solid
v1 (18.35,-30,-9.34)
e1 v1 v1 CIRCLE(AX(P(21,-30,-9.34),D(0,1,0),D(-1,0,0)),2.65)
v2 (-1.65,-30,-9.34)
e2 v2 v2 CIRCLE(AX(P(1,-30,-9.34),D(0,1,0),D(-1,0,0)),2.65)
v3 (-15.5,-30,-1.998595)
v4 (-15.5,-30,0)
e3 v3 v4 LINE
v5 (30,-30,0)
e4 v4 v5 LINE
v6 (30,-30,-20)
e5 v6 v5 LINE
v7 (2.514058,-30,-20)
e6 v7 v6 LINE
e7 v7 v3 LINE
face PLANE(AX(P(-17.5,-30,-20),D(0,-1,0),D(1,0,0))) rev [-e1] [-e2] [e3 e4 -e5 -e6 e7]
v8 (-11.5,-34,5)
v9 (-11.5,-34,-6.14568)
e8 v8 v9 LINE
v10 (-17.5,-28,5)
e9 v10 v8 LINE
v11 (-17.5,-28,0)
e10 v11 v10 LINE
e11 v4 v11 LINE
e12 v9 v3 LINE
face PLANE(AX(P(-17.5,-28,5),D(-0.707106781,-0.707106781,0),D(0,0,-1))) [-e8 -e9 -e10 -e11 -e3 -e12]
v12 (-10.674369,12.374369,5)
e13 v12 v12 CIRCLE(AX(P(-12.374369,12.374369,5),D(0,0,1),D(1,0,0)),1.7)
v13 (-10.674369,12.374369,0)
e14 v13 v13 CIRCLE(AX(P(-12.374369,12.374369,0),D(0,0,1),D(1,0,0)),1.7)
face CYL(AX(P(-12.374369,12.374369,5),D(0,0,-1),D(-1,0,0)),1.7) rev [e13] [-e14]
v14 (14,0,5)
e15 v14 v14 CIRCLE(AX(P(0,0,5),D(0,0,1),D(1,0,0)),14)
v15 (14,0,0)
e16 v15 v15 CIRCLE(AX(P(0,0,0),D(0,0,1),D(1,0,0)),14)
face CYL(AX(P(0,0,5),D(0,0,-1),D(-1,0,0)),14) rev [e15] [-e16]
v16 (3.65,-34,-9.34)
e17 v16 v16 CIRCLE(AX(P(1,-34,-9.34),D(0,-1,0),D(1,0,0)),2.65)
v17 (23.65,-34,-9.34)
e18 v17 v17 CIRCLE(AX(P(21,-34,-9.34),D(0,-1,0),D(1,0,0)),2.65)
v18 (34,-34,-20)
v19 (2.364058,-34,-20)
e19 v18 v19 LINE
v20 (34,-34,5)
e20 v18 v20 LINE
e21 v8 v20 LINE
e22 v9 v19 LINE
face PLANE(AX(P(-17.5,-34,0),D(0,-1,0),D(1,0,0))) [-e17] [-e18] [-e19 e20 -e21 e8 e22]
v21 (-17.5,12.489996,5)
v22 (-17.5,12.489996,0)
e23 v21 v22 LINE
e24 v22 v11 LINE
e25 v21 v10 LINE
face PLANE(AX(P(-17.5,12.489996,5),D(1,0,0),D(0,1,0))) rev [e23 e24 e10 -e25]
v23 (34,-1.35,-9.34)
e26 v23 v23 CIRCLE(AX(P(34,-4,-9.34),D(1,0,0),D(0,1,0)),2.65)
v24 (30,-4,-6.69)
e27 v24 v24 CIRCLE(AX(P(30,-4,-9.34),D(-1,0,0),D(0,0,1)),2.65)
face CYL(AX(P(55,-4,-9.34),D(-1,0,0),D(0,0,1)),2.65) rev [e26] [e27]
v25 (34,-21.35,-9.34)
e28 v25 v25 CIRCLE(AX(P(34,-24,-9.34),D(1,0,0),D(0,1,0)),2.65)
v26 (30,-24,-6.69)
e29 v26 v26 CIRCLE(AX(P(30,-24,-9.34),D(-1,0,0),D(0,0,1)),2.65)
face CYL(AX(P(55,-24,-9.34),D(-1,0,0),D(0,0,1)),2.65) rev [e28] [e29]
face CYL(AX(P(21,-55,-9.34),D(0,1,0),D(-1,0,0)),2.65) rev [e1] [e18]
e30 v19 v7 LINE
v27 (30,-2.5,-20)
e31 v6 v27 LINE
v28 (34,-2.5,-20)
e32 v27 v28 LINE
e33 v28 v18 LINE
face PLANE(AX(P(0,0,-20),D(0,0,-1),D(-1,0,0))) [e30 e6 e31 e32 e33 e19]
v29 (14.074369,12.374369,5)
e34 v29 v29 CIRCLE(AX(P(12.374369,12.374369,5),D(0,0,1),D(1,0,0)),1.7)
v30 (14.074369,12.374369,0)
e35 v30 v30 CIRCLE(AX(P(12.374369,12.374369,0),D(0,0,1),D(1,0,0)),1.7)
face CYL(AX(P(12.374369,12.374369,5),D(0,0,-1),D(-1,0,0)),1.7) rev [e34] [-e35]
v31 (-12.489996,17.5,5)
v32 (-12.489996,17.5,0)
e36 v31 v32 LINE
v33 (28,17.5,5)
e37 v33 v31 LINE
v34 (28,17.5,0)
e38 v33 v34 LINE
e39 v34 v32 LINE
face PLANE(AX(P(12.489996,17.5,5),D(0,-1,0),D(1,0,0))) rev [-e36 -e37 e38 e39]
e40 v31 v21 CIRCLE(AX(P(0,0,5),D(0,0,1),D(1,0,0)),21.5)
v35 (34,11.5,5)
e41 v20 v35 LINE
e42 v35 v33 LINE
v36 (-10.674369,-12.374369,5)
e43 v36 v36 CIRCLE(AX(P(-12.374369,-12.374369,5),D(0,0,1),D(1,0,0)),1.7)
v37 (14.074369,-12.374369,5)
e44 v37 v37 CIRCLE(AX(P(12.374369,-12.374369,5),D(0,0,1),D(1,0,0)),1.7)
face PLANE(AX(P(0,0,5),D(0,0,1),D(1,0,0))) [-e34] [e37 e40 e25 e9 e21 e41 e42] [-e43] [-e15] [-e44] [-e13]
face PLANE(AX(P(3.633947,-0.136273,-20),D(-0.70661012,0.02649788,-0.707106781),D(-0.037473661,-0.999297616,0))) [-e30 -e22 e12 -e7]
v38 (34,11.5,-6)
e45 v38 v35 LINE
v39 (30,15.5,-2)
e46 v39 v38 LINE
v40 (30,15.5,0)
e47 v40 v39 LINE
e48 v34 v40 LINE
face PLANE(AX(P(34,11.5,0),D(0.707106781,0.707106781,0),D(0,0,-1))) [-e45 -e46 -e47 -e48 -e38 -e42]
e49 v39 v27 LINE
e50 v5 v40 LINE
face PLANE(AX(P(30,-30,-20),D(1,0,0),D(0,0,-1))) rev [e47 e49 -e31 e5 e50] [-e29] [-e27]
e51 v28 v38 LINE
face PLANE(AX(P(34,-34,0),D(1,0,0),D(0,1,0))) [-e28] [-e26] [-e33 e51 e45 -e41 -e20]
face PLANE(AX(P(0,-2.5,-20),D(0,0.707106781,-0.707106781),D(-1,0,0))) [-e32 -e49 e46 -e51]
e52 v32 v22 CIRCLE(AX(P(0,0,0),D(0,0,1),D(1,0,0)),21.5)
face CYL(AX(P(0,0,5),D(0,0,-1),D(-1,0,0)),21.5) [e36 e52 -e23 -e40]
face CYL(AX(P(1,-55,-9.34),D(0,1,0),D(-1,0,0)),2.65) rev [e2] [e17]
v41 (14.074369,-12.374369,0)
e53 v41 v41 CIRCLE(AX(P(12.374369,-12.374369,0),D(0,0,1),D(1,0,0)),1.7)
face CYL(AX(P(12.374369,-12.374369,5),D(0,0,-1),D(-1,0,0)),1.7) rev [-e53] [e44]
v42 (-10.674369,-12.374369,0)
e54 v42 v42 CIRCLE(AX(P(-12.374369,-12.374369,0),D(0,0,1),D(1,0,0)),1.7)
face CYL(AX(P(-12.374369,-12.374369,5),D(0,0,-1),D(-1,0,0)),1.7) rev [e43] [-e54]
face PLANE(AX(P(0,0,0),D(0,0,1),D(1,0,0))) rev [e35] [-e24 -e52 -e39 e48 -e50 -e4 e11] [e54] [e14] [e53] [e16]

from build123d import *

# Parameters (mm, degrees)
ESQUISSE2_R             = 14
ESQUISSE2_R_2           = 1.7
BOSS_EXTRU_1_DEPTH      = 5
BOSS_EXTRU_2_DEPTH      = 5
BOSS_EXTRU_3_DEPTH      = 20
CHANFREIN1_SIZE         = 20
ENL_V_MAT_EXTRU_1_DEPTH = 25
CHANFREIN2_SIZE         = 6
ESQUISSE6_R             = 2.65
ENL_V_MAT_EXTRU_2_DEPTH = 25
ESQUISSE7_R             = 2.65
ENL_V_MAT_EXTRU_3_DEPTH = 25


# Some blends are built 0.0001 mm under size
with BuildPart() as part:
    # Esquisse2 → Boss.-Extru.1 (new body)
    with BuildSketch(Plane.XY):
        with BuildLine():
            Line((12.489995997, 17.5), (-12.489995997, 17.5))
            ThreePointArc((-12.489995997, 17.5), (-15.202795796, 15.202795796), (-17.5, 12.489995997))
            Line((-17.5, 12.489995997), (-17.5, -12.489995997))
            ThreePointArc((-17.5, -12.489995997), (-15.202795796, -15.202795796), (-12.489995997, -17.5))
            Line((-12.489995997, -17.5), (12.489995997, -17.5))
            ThreePointArc((12.489995997, -17.5), (15.202795796, -15.202795796), (17.5, -12.489995997))
            Line((17.5, -12.489995997), (17.5, 12.489995997))
            ThreePointArc((17.5, 12.489995997), (15.202795796, 15.202795796), (12.489995997, 17.5))
        make_face()
        Circle(ESQUISSE2_R, mode=Mode.SUBTRACT)
        with Locations((-12.374368671, -12.374368671)):
            Circle(ESQUISSE2_R_2, mode=Mode.SUBTRACT)
        with Locations((12.374368671, -12.374368671)):
            Circle(ESQUISSE2_R_2, mode=Mode.SUBTRACT)
        with Locations((12.374368671, 12.374368671)):
            Circle(ESQUISSE2_R_2, mode=Mode.SUBTRACT)
        with Locations((-12.374368671, 12.374368671)):
            Circle(ESQUISSE2_R_2, mode=Mode.SUBTRACT)
    extrude(amount=BOSS_EXTRU_1_DEPTH)



with BuildPart() as body_2:
    # Esquisse3 → Boss.-Extru.2 (new body)
    with BuildSketch(Plane.XY.offset(5)):
        with BuildLine():
            Line((-17.5, -12.489995997), (-17.5, -34))
            Line((-17.5, -34), (34, -34))
            Line((34, -34), (34, 17.5))
            Line((34, 17.5), (12.489995997, 17.5))
            ThreePointArc((12.489995997, 17.5), (15.202795796, 15.202795796), (17.5, 12.489995997))
            Line((17.5, 12.489995997), (17.5, -12.489995997))
            ThreePointArc((17.5, -12.489995997), (15.202795796, -15.202795796), (12.489995997, -17.5))
            Line((12.489995997, -17.5), (-12.489995997, -17.5))
            ThreePointArc((-12.489995997, -17.5), (-15.202795796, -15.202795796), (-17.5, -12.489995997))
        make_face()
    extrude(amount=-BOSS_EXTRU_2_DEPTH)


with BuildPart() as part_1:
    add(part.part)

    add(body_2.part)  # Boss.-Extru.3 merges body 2
    # Esquisse4 → Boss.-Extru.3 (add)
    with BuildSketch(Plane(origin=(0, 0, 0), x_dir=(-1, 0, 0), z_dir=(0, 0, -1))):
        Polygon((-34, 17.5), (-34, -34), (17.65, -34), (17.5, -30), (-30, -30), (-30, 17.5), align=None)
    extrude(amount=BOSS_EXTRU_3_DEPTH)

    # Chanfrein1
    chanfrein1_edges = [part_1.edges().sort_by_distance(p)[0] for p in [
        (32, 17.5, -20),
        (-17.575, -32, -20),
    ]]
    chamfer(chanfrein1_edges, length=CHANFREIN1_SIZE - 0.0001)  # a hair under: the kernel refuses the full size

    # Esquisse5 → Enlèv. mat.-Extru.1 (cut)
    with BuildSketch(Plane.XY):
        Polygon((-17.5, -34), (-17.5, -30), (-17.65, -34), align=None)
    extrude(amount=-ENL_V_MAT_EXTRU_1_DEPTH, mode=Mode.SUBTRACT)

    # Chanfrein2
    # the kernel refuses this chamfer: 6 mm, written as the material it takes off along each edge
    with BuildSketch(Plane(origin=(-17.5, -34, 20.430097928), x_dir=(0.9996219169112969, -0.027495876610582164, 0), z_dir=(0, 0, -1))) as chanfrein2_piece_1:
        Polygon((CHANFREIN2_SIZE * 0.999621916911, -CHANFREIN2_SIZE * 0.0274958766106), (-CHANFREIN2_SIZE * 0.0274958766106, -CHANFREIN2_SIZE * 0.999621916911), (0, 0), align=None)
    extrude(amount=36.010190498, mode=Mode.SUBTRACT)
    with BuildSketch(Plane(origin=(34, 17.5, -15.430197928), x_dir=(-0.9996219169112969, 0.027495876610585633, 0), z_dir=(0, 0, 1))) as chanfrein2_piece_2:
        Polygon((CHANFREIN2_SIZE * 0.999621916911, CHANFREIN2_SIZE * 0.0274958766106), (-CHANFREIN2_SIZE * 0.0274958766106, CHANFREIN2_SIZE * 0.999621916911), (0, 0), align=None)
    extrude(amount=35.860295856, mode=Mode.SUBTRACT)

    # Esquisse6 → Enlèv. mat.-Extru.2 (cut)
    with BuildSketch(Plane.ZY.offset(-30)):
        with Locations((-9.34, -4)):
            Circle(ESQUISSE6_R)
        with Locations((-9.34, -24)):
            Circle(ESQUISSE6_R)
    extrude(amount=-ENL_V_MAT_EXTRU_2_DEPTH, mode=Mode.SUBTRACT)

    # Esquisse7 → Enlèv. mat.-Extru.3 (cut)
    with BuildSketch(Plane(origin=(0, -30, 0), x_dir=(1, 0, 0), z_dir=(0, 1, 0))):
        with Locations(Location((1, 9.34, 0), (0, 0, 180))):
            Circle(ESQUISSE7_R)
        with Locations(Location((21, 9.34, 0), (0, 0, 180))):
            Circle(ESQUISSE7_R)
    extrude(amount=-ENL_V_MAT_EXTRU_3_DEPTH, mode=Mode.SUBTRACT)


solid = part_1.part
